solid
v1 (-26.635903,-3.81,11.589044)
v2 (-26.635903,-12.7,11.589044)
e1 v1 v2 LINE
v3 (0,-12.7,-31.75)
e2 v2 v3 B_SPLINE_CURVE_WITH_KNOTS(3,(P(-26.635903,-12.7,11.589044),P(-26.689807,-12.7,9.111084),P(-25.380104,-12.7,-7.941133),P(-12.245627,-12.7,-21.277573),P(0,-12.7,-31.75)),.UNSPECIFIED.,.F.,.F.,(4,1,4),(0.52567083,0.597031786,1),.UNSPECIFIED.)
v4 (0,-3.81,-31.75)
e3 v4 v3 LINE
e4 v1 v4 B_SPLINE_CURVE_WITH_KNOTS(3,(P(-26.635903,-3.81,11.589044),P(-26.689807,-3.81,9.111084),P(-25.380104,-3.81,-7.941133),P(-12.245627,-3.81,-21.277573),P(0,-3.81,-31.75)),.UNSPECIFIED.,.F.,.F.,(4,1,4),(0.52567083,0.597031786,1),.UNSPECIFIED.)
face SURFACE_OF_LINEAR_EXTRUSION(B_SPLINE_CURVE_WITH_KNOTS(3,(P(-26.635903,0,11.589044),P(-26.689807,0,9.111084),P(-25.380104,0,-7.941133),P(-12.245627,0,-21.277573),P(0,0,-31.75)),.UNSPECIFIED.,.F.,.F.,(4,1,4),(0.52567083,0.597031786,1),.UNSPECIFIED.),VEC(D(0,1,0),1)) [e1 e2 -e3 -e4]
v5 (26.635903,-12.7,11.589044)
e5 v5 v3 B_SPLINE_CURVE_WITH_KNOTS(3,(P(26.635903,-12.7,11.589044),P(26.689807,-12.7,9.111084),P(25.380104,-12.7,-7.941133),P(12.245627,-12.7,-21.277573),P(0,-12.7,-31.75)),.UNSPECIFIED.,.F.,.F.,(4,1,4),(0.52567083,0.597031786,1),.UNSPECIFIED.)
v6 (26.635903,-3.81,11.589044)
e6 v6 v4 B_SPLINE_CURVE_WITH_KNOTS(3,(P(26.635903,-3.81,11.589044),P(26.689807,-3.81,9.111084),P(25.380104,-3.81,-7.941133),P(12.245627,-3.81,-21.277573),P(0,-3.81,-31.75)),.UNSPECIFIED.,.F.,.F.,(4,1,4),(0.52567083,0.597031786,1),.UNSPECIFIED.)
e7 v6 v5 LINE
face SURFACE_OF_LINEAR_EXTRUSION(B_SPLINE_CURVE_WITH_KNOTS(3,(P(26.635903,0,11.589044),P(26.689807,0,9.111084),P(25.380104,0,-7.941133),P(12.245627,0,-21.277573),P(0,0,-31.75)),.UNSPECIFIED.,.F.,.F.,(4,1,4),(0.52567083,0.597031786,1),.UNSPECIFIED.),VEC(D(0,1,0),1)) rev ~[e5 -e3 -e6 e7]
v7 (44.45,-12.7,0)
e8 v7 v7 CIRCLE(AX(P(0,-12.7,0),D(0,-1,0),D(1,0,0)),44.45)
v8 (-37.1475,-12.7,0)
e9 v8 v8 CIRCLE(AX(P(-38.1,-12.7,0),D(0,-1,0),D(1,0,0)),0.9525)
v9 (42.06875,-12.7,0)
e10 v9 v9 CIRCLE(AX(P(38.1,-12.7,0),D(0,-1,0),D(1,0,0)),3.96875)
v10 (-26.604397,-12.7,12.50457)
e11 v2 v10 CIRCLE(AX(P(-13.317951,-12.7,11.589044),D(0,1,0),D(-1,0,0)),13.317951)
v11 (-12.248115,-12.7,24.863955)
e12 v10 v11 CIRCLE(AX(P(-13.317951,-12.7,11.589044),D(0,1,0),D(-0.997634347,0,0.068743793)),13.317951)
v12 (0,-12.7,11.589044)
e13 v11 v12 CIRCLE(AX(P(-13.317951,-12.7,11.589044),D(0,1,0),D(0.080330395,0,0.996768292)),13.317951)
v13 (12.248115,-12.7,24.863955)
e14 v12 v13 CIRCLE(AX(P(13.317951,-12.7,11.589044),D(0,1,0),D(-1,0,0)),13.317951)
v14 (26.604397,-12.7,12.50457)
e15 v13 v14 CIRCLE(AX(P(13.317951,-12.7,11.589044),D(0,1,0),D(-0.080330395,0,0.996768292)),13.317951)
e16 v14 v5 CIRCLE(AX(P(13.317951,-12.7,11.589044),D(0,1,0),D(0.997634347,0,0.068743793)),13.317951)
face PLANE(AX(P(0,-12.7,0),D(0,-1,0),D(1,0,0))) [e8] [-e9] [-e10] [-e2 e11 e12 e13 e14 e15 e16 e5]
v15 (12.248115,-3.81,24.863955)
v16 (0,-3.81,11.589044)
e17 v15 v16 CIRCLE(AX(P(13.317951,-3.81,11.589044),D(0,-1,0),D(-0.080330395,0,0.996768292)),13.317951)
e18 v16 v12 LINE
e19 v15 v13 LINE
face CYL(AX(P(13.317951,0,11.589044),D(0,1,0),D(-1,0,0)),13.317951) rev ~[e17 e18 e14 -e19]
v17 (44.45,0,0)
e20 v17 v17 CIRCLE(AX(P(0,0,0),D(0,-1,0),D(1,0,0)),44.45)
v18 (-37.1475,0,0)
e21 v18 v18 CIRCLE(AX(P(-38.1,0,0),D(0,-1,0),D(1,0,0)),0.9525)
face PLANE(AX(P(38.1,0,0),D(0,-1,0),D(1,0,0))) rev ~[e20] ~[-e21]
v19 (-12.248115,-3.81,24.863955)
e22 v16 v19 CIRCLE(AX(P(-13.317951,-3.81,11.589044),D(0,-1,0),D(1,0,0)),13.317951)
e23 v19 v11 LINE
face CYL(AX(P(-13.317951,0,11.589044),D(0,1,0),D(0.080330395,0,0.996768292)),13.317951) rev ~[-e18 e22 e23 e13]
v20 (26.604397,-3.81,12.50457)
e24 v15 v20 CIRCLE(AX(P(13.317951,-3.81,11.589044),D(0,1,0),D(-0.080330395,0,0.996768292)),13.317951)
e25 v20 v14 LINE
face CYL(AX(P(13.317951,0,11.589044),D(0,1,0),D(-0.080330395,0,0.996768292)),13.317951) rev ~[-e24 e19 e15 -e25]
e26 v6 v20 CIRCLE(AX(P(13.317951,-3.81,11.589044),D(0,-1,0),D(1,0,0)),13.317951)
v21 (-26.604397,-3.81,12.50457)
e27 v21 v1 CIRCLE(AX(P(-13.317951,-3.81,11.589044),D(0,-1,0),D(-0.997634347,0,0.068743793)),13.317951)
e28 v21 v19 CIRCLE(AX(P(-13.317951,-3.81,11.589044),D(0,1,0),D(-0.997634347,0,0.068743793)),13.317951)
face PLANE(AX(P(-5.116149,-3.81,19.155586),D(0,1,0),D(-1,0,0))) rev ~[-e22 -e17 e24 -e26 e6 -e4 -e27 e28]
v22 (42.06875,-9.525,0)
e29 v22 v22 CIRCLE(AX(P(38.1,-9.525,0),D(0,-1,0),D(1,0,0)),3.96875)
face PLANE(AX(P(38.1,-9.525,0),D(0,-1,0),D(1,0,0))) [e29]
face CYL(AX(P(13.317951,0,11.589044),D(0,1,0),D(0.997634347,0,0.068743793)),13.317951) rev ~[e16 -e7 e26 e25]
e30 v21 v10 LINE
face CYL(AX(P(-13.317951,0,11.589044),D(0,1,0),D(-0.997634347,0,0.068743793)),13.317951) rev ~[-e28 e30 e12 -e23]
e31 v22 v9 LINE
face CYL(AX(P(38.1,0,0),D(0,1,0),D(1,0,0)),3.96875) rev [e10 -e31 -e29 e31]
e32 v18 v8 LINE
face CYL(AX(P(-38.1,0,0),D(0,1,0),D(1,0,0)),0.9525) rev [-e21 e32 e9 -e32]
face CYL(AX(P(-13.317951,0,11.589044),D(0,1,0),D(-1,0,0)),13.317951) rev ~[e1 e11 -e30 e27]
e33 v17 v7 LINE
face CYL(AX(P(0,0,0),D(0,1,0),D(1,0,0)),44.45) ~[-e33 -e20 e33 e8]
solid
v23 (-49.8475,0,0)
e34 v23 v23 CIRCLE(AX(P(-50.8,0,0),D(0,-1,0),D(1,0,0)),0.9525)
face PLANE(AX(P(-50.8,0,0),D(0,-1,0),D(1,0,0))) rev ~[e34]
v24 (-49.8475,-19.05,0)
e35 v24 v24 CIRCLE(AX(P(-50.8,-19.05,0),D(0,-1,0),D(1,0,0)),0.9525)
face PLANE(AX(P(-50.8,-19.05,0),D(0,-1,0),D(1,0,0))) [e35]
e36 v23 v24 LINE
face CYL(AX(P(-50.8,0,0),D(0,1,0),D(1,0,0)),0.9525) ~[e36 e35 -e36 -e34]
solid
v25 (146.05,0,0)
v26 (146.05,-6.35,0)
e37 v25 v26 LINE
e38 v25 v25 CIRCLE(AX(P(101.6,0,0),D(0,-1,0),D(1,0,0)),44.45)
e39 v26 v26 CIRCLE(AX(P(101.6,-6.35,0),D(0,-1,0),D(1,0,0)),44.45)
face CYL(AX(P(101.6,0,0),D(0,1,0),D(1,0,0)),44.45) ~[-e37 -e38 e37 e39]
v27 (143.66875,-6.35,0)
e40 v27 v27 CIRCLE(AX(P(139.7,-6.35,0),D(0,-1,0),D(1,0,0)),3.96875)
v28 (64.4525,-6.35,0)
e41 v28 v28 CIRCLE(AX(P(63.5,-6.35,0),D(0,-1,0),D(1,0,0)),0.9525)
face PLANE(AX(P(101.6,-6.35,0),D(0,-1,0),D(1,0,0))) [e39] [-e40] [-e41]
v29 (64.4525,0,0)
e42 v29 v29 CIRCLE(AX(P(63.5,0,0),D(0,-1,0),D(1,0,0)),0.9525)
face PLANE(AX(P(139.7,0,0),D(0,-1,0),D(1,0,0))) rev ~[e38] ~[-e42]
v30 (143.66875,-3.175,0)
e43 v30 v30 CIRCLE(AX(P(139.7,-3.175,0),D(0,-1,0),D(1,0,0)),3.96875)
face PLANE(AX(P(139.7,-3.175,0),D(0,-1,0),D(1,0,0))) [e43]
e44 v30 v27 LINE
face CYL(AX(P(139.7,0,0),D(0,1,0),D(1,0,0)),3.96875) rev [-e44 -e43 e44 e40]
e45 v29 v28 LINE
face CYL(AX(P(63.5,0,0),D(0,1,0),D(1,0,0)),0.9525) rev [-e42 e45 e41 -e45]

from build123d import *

# Parameters (mm, degrees)
F0_R     = 44.45
F0_R_2   = 0.9525
F0_R_3   = 3.96875
F1_DEPTH = 12.7
F2_DEPTH = 3.81
F3_DEPTH = 9.525
F4_DEPTH = 6.35
F5_DEPTH = 3.175
F6_DEPTH = 19.05


with BuildPart() as f1:
    # F0 (on Front) → F1 (new body)
    with BuildSketch(Plane.XZ):
        Circle(F0_R)
        with BuildLine():
            ThreePointArc((-12.2481151241, 24.8639554142), (-3.5297989426, 20.6200957751), (0, 11.5890437267))
            ThreePointArc((0, 11.5890437267), (3.5297989426, 20.6200957751), (12.2481151241, 24.8639554142))
            add(Edge.make_bspline(
                [(12.2481151241, 24.8639554142), (14.6922572571, 26.4350209104), (22.4074488188, 29.3295793858), (26.2533609705, 19.9457695703), (26.6043971909, 12.5045702251)],
                knots=[0.201568932, 0.201568932, 0.201568932, 0.201568932, 0.3004267747, 0.5168406107, 0.5168406107, 0.5168406107, 0.5168406107], degree=3))
            ThreePointArc((26.6043971909, 12.5045702251), (26.6280240963, 12.0470779435), (26.6359028388, 11.5890437267))
            add(Edge.make_bspline(
                [(26.6359028388, 11.5890437267), (26.6898066873, 9.1110835654), (25.3801041465, -7.941133268), (12.2456271202, -21.2775729597), (0, -31.75)],
                knots=[0.5256708302, 0.5256708302, 0.5256708302, 0.5256708302, 0.5970317864, 1, 1, 1, 1], degree=3))
            add(Edge.make_bspline(
                [(-26.6359028388, 11.5890437267), (-26.6898066873, 9.1110835654), (-25.3801041465, -7.941133268), (-12.2456271202, -21.2775729597), (0, -31.75)],
                knots=[0.5256708302, 0.5256708302, 0.5256708302, 0.5256708302, 0.5970317864, 1, 1, 1, 1], degree=3))
            ThreePointArc((-26.6359028388, 11.5890437267), (-26.6280240963, 12.0470779435), (-26.6043971909, 12.5045702251))
            add(Edge.make_bspline(
                [(-12.2481151241, 24.8639554142), (-14.6922572571, 26.4350209104), (-22.4074488188, 29.3295793858), (-26.2533609705, 19.9457695703), (-26.6043971909, 12.5045702251)],
                knots=[0.201568932, 0.201568932, 0.201568932, 0.201568932, 0.3004267747, 0.5168406107, 0.5168406107, 0.5168406107, 0.5168406107], degree=3))
        make_face(mode=Mode.SUBTRACT)
        with Locations((-38.1, 0)):
            Circle(F0_R_2, mode=Mode.SUBTRACT)
        with Locations((38.1, 0)):
            Circle(F0_R_3, mode=Mode.SUBTRACT)
        with BuildLine():
            ThreePointArc((-26.6043971909, 12.5045702251), (-22.0070242892, 21.6820037817), (-12.2481151241, 24.8639554142))
            add(Edge.make_bspline(
                [(-12.2481151241, 24.8639554142), (-14.6922572571, 26.4350209104), (-22.4074488188, 29.3295793858), (-26.2533609705, 19.9457695703), (-26.6043971909, 12.5045702251)],
                knots=[0.201568932, 0.201568932, 0.201568932, 0.201568932, 0.3004267747, 0.5168406107, 0.5168406107, 0.5168406107, 0.5168406107], degree=3))
        make_face()
        with BuildLine():
            add(Edge.make_bspline(
                [(12.2481151241, 24.8639554142), (14.6922572571, 26.4350209104), (22.4074488188, 29.3295793858), (26.2533609705, 19.9457695703), (26.6043971909, 12.5045702251)],
                knots=[0.201568932, 0.201568932, 0.201568932, 0.201568932, 0.3004267747, 0.5168406107, 0.5168406107, 0.5168406107, 0.5168406107], degree=3))
            ThreePointArc((12.2481151241, 24.8639554142), (22.0070242892, 21.6820037817), (26.6043971909, 12.5045702251))
        make_face()
    extrude(amount=F1_DEPTH)

    # F0 (on Front) → F2 (join)
    with BuildSketch(Plane.XZ):
        with BuildLine():
            add(Edge.make_bspline(
                [(0, 11.5890437267), (-2.1773432855, 15.6990310035), (-7.2645639382, 21.6605879785), (-12.2481151241, 24.8639554142)],
                knots=[0, 0, 0, 0, 0.201568932, 0.201568932, 0.201568932, 0.201568932], degree=3))
            ThreePointArc((0, 11.5890437267), (-3.5297989426, 20.6200957751), (-12.2481151241, 24.8639554142))
        make_face()
        with BuildLine():
            add(Edge.make_bspline(
                [(0, 11.5890437267), (2.1773432855, 15.6990310035), (7.2645639382, 21.6605879785), (12.2481151241, 24.8639554142)],
                knots=[0, 0, 0, 0, 0.201568932, 0.201568932, 0.201568932, 0.201568932], degree=3))
            add(Edge.make_bspline(
                [(0, 11.5890437267), (-2.1773432855, 15.6990310035), (-7.2645639382, 21.6605879785), (-12.2481151241, 24.8639554142)],
                knots=[0, 0, 0, 0, 0.201568932, 0.201568932, 0.201568932, 0.201568932], degree=3))
            ThreePointArc((-12.2481151241, 24.8639554142), (-22.0070242892, 21.6820037817), (-26.6043971909, 12.5045702251))
            add(Edge.make_bspline(
                [(-26.6043971909, 12.5045702251), (-26.6187203366, 12.2009508949), (-26.6292327654, 11.8956670321), (-26.6359028388, 11.5890437267)],
                knots=[0.5168406107, 0.5168406107, 0.5168406107, 0.5168406107, 0.5256708302, 0.5256708302, 0.5256708302, 0.5256708302], degree=3))
            add(Edge.make_bspline(
                [(-26.6359028388, 11.5890437267), (-26.6898066873, 9.1110835654), (-25.3801041465, -7.941133268), (-12.2456271202, -21.2775729597), (0, -31.75)],
                knots=[0.5256708302, 0.5256708302, 0.5256708302, 0.5256708302, 0.5970317864, 1, 1, 1, 1], degree=3))
            add(Edge.make_bspline(
                [(26.6359028388, 11.5890437267), (26.6898066873, 9.1110835654), (25.3801041465, -7.941133268), (12.2456271202, -21.2775729597), (0, -31.75)],
                knots=[0.5256708302, 0.5256708302, 0.5256708302, 0.5256708302, 0.5970317864, 1, 1, 1, 1], degree=3))
            add(Edge.make_bspline(
                [(26.6043971909, 12.5045702251), (26.6187203366, 12.2009508949), (26.6292327654, 11.8956670321), (26.6359028388, 11.5890437267)],
                knots=[0.5168406107, 0.5168406107, 0.5168406107, 0.5168406107, 0.5256708302, 0.5256708302, 0.5256708302, 0.5256708302], degree=3))
            ThreePointArc((26.6043971909, 12.5045702251), (22.0070242892, 21.6820037817), (12.2481151241, 24.8639554142))
        make_face()
        with BuildLine():
            ThreePointArc((12.2481151241, 24.8639554142), (3.5297989426, 20.6200957751), (0, 11.5890437267))
            add(Edge.make_bspline(
                [(0, 11.5890437267), (2.1773432855, 15.6990310035), (7.2645639382, 21.6605879785), (12.2481151241, 24.8639554142)],
                knots=[0, 0, 0, 0, 0.201568932, 0.201568932, 0.201568932, 0.201568932], degree=3))
        make_face()
        with BuildLine():
            ThreePointArc((-26.6043971909, 12.5045702251), (-22.0070242892, 21.6820037817), (-12.2481151241, 24.8639554142))
            add(Edge.make_bspline(
                [(-12.2481151241, 24.8639554142), (-14.6922572571, 26.4350209104), (-22.4074488188, 29.3295793858), (-26.2533609705, 19.9457695703), (-26.6043971909, 12.5045702251)],
                knots=[0.201568932, 0.201568932, 0.201568932, 0.201568932, 0.3004267747, 0.5168406107, 0.5168406107, 0.5168406107, 0.5168406107], degree=3))
        make_face()
        with BuildLine():
            add(Edge.make_bspline(
                [(12.2481151241, 24.8639554142), (14.6922572571, 26.4350209104), (22.4074488188, 29.3295793858), (26.2533609705, 19.9457695703), (26.6043971909, 12.5045702251)],
                knots=[0.201568932, 0.201568932, 0.201568932, 0.201568932, 0.3004267747, 0.5168406107, 0.5168406107, 0.5168406107, 0.5168406107], degree=3))
            ThreePointArc((12.2481151241, 24.8639554142), (22.0070242892, 21.6820037817), (26.6043971909, 12.5045702251))
        make_face()
        with BuildLine():
            add(Edge.make_bspline(
                [(-26.6043971909, 12.5045702251), (-26.6187203366, 12.2009508949), (-26.6292327654, 11.8956670321), (-26.6359028388, 11.5890437267)],
                knots=[0.5168406107, 0.5168406107, 0.5168406107, 0.5168406107, 0.5256708302, 0.5256708302, 0.5256708302, 0.5256708302], degree=3))
            ThreePointArc((-26.6043971909, 12.5045702251), (-26.6280240963, 12.0470779435), (-26.6359028388, 11.5890437267))
        make_face()
        with BuildLine():
            ThreePointArc((26.6359028388, 11.5890437267), (26.6280240963, 12.0470779435), (26.6043971909, 12.5045702251))
            add(Edge.make_bspline(
                [(26.6043971909, 12.5045702251), (26.6187203366, 12.2009508949), (26.6292327654, 11.8956670321), (26.6359028388, 11.5890437267)],
                knots=[0.5168406107, 0.5168406107, 0.5168406107, 0.5168406107, 0.5256708302, 0.5256708302, 0.5256708302, 0.5256708302], degree=3))
        make_face()
    extrude(amount=F2_DEPTH)

    # F0 (on Front) → F3 (join)
    with BuildSketch(Plane.XZ):
        with Locations((38.1, 0)):
            Circle(F0_R_3)
    extrude(amount=F3_DEPTH)


with BuildPart() as f4:
    # F0 (on Front) → F4 (new body)
    with BuildSketch(Plane.XZ):
        with Locations((101.6, 0)):
            Circle(F0_R)
        with Locations((63.5, 0)):
            Circle(F0_R_2, mode=Mode.SUBTRACT)
        with Locations((139.7, 0)):
            Circle(F0_R_3, mode=Mode.SUBTRACT)
    extrude(amount=F4_DEPTH)

    # F0 (on Front) → F5 (join)
    with BuildSketch(Plane.XZ):
        with Locations((139.7, 0)):
            Circle(F0_R_3)
    extrude(amount=F5_DEPTH)


with BuildPart() as f6:
    # F0 (on Front) → F6 (new body)
    with BuildSketch(Plane.XZ):
        with Locations((-50.8, 0)):
            Circle(F0_R_2)
    extrude(amount=F6_DEPTH)


solid = Compound([f1.part, f4.part, f6.part])
